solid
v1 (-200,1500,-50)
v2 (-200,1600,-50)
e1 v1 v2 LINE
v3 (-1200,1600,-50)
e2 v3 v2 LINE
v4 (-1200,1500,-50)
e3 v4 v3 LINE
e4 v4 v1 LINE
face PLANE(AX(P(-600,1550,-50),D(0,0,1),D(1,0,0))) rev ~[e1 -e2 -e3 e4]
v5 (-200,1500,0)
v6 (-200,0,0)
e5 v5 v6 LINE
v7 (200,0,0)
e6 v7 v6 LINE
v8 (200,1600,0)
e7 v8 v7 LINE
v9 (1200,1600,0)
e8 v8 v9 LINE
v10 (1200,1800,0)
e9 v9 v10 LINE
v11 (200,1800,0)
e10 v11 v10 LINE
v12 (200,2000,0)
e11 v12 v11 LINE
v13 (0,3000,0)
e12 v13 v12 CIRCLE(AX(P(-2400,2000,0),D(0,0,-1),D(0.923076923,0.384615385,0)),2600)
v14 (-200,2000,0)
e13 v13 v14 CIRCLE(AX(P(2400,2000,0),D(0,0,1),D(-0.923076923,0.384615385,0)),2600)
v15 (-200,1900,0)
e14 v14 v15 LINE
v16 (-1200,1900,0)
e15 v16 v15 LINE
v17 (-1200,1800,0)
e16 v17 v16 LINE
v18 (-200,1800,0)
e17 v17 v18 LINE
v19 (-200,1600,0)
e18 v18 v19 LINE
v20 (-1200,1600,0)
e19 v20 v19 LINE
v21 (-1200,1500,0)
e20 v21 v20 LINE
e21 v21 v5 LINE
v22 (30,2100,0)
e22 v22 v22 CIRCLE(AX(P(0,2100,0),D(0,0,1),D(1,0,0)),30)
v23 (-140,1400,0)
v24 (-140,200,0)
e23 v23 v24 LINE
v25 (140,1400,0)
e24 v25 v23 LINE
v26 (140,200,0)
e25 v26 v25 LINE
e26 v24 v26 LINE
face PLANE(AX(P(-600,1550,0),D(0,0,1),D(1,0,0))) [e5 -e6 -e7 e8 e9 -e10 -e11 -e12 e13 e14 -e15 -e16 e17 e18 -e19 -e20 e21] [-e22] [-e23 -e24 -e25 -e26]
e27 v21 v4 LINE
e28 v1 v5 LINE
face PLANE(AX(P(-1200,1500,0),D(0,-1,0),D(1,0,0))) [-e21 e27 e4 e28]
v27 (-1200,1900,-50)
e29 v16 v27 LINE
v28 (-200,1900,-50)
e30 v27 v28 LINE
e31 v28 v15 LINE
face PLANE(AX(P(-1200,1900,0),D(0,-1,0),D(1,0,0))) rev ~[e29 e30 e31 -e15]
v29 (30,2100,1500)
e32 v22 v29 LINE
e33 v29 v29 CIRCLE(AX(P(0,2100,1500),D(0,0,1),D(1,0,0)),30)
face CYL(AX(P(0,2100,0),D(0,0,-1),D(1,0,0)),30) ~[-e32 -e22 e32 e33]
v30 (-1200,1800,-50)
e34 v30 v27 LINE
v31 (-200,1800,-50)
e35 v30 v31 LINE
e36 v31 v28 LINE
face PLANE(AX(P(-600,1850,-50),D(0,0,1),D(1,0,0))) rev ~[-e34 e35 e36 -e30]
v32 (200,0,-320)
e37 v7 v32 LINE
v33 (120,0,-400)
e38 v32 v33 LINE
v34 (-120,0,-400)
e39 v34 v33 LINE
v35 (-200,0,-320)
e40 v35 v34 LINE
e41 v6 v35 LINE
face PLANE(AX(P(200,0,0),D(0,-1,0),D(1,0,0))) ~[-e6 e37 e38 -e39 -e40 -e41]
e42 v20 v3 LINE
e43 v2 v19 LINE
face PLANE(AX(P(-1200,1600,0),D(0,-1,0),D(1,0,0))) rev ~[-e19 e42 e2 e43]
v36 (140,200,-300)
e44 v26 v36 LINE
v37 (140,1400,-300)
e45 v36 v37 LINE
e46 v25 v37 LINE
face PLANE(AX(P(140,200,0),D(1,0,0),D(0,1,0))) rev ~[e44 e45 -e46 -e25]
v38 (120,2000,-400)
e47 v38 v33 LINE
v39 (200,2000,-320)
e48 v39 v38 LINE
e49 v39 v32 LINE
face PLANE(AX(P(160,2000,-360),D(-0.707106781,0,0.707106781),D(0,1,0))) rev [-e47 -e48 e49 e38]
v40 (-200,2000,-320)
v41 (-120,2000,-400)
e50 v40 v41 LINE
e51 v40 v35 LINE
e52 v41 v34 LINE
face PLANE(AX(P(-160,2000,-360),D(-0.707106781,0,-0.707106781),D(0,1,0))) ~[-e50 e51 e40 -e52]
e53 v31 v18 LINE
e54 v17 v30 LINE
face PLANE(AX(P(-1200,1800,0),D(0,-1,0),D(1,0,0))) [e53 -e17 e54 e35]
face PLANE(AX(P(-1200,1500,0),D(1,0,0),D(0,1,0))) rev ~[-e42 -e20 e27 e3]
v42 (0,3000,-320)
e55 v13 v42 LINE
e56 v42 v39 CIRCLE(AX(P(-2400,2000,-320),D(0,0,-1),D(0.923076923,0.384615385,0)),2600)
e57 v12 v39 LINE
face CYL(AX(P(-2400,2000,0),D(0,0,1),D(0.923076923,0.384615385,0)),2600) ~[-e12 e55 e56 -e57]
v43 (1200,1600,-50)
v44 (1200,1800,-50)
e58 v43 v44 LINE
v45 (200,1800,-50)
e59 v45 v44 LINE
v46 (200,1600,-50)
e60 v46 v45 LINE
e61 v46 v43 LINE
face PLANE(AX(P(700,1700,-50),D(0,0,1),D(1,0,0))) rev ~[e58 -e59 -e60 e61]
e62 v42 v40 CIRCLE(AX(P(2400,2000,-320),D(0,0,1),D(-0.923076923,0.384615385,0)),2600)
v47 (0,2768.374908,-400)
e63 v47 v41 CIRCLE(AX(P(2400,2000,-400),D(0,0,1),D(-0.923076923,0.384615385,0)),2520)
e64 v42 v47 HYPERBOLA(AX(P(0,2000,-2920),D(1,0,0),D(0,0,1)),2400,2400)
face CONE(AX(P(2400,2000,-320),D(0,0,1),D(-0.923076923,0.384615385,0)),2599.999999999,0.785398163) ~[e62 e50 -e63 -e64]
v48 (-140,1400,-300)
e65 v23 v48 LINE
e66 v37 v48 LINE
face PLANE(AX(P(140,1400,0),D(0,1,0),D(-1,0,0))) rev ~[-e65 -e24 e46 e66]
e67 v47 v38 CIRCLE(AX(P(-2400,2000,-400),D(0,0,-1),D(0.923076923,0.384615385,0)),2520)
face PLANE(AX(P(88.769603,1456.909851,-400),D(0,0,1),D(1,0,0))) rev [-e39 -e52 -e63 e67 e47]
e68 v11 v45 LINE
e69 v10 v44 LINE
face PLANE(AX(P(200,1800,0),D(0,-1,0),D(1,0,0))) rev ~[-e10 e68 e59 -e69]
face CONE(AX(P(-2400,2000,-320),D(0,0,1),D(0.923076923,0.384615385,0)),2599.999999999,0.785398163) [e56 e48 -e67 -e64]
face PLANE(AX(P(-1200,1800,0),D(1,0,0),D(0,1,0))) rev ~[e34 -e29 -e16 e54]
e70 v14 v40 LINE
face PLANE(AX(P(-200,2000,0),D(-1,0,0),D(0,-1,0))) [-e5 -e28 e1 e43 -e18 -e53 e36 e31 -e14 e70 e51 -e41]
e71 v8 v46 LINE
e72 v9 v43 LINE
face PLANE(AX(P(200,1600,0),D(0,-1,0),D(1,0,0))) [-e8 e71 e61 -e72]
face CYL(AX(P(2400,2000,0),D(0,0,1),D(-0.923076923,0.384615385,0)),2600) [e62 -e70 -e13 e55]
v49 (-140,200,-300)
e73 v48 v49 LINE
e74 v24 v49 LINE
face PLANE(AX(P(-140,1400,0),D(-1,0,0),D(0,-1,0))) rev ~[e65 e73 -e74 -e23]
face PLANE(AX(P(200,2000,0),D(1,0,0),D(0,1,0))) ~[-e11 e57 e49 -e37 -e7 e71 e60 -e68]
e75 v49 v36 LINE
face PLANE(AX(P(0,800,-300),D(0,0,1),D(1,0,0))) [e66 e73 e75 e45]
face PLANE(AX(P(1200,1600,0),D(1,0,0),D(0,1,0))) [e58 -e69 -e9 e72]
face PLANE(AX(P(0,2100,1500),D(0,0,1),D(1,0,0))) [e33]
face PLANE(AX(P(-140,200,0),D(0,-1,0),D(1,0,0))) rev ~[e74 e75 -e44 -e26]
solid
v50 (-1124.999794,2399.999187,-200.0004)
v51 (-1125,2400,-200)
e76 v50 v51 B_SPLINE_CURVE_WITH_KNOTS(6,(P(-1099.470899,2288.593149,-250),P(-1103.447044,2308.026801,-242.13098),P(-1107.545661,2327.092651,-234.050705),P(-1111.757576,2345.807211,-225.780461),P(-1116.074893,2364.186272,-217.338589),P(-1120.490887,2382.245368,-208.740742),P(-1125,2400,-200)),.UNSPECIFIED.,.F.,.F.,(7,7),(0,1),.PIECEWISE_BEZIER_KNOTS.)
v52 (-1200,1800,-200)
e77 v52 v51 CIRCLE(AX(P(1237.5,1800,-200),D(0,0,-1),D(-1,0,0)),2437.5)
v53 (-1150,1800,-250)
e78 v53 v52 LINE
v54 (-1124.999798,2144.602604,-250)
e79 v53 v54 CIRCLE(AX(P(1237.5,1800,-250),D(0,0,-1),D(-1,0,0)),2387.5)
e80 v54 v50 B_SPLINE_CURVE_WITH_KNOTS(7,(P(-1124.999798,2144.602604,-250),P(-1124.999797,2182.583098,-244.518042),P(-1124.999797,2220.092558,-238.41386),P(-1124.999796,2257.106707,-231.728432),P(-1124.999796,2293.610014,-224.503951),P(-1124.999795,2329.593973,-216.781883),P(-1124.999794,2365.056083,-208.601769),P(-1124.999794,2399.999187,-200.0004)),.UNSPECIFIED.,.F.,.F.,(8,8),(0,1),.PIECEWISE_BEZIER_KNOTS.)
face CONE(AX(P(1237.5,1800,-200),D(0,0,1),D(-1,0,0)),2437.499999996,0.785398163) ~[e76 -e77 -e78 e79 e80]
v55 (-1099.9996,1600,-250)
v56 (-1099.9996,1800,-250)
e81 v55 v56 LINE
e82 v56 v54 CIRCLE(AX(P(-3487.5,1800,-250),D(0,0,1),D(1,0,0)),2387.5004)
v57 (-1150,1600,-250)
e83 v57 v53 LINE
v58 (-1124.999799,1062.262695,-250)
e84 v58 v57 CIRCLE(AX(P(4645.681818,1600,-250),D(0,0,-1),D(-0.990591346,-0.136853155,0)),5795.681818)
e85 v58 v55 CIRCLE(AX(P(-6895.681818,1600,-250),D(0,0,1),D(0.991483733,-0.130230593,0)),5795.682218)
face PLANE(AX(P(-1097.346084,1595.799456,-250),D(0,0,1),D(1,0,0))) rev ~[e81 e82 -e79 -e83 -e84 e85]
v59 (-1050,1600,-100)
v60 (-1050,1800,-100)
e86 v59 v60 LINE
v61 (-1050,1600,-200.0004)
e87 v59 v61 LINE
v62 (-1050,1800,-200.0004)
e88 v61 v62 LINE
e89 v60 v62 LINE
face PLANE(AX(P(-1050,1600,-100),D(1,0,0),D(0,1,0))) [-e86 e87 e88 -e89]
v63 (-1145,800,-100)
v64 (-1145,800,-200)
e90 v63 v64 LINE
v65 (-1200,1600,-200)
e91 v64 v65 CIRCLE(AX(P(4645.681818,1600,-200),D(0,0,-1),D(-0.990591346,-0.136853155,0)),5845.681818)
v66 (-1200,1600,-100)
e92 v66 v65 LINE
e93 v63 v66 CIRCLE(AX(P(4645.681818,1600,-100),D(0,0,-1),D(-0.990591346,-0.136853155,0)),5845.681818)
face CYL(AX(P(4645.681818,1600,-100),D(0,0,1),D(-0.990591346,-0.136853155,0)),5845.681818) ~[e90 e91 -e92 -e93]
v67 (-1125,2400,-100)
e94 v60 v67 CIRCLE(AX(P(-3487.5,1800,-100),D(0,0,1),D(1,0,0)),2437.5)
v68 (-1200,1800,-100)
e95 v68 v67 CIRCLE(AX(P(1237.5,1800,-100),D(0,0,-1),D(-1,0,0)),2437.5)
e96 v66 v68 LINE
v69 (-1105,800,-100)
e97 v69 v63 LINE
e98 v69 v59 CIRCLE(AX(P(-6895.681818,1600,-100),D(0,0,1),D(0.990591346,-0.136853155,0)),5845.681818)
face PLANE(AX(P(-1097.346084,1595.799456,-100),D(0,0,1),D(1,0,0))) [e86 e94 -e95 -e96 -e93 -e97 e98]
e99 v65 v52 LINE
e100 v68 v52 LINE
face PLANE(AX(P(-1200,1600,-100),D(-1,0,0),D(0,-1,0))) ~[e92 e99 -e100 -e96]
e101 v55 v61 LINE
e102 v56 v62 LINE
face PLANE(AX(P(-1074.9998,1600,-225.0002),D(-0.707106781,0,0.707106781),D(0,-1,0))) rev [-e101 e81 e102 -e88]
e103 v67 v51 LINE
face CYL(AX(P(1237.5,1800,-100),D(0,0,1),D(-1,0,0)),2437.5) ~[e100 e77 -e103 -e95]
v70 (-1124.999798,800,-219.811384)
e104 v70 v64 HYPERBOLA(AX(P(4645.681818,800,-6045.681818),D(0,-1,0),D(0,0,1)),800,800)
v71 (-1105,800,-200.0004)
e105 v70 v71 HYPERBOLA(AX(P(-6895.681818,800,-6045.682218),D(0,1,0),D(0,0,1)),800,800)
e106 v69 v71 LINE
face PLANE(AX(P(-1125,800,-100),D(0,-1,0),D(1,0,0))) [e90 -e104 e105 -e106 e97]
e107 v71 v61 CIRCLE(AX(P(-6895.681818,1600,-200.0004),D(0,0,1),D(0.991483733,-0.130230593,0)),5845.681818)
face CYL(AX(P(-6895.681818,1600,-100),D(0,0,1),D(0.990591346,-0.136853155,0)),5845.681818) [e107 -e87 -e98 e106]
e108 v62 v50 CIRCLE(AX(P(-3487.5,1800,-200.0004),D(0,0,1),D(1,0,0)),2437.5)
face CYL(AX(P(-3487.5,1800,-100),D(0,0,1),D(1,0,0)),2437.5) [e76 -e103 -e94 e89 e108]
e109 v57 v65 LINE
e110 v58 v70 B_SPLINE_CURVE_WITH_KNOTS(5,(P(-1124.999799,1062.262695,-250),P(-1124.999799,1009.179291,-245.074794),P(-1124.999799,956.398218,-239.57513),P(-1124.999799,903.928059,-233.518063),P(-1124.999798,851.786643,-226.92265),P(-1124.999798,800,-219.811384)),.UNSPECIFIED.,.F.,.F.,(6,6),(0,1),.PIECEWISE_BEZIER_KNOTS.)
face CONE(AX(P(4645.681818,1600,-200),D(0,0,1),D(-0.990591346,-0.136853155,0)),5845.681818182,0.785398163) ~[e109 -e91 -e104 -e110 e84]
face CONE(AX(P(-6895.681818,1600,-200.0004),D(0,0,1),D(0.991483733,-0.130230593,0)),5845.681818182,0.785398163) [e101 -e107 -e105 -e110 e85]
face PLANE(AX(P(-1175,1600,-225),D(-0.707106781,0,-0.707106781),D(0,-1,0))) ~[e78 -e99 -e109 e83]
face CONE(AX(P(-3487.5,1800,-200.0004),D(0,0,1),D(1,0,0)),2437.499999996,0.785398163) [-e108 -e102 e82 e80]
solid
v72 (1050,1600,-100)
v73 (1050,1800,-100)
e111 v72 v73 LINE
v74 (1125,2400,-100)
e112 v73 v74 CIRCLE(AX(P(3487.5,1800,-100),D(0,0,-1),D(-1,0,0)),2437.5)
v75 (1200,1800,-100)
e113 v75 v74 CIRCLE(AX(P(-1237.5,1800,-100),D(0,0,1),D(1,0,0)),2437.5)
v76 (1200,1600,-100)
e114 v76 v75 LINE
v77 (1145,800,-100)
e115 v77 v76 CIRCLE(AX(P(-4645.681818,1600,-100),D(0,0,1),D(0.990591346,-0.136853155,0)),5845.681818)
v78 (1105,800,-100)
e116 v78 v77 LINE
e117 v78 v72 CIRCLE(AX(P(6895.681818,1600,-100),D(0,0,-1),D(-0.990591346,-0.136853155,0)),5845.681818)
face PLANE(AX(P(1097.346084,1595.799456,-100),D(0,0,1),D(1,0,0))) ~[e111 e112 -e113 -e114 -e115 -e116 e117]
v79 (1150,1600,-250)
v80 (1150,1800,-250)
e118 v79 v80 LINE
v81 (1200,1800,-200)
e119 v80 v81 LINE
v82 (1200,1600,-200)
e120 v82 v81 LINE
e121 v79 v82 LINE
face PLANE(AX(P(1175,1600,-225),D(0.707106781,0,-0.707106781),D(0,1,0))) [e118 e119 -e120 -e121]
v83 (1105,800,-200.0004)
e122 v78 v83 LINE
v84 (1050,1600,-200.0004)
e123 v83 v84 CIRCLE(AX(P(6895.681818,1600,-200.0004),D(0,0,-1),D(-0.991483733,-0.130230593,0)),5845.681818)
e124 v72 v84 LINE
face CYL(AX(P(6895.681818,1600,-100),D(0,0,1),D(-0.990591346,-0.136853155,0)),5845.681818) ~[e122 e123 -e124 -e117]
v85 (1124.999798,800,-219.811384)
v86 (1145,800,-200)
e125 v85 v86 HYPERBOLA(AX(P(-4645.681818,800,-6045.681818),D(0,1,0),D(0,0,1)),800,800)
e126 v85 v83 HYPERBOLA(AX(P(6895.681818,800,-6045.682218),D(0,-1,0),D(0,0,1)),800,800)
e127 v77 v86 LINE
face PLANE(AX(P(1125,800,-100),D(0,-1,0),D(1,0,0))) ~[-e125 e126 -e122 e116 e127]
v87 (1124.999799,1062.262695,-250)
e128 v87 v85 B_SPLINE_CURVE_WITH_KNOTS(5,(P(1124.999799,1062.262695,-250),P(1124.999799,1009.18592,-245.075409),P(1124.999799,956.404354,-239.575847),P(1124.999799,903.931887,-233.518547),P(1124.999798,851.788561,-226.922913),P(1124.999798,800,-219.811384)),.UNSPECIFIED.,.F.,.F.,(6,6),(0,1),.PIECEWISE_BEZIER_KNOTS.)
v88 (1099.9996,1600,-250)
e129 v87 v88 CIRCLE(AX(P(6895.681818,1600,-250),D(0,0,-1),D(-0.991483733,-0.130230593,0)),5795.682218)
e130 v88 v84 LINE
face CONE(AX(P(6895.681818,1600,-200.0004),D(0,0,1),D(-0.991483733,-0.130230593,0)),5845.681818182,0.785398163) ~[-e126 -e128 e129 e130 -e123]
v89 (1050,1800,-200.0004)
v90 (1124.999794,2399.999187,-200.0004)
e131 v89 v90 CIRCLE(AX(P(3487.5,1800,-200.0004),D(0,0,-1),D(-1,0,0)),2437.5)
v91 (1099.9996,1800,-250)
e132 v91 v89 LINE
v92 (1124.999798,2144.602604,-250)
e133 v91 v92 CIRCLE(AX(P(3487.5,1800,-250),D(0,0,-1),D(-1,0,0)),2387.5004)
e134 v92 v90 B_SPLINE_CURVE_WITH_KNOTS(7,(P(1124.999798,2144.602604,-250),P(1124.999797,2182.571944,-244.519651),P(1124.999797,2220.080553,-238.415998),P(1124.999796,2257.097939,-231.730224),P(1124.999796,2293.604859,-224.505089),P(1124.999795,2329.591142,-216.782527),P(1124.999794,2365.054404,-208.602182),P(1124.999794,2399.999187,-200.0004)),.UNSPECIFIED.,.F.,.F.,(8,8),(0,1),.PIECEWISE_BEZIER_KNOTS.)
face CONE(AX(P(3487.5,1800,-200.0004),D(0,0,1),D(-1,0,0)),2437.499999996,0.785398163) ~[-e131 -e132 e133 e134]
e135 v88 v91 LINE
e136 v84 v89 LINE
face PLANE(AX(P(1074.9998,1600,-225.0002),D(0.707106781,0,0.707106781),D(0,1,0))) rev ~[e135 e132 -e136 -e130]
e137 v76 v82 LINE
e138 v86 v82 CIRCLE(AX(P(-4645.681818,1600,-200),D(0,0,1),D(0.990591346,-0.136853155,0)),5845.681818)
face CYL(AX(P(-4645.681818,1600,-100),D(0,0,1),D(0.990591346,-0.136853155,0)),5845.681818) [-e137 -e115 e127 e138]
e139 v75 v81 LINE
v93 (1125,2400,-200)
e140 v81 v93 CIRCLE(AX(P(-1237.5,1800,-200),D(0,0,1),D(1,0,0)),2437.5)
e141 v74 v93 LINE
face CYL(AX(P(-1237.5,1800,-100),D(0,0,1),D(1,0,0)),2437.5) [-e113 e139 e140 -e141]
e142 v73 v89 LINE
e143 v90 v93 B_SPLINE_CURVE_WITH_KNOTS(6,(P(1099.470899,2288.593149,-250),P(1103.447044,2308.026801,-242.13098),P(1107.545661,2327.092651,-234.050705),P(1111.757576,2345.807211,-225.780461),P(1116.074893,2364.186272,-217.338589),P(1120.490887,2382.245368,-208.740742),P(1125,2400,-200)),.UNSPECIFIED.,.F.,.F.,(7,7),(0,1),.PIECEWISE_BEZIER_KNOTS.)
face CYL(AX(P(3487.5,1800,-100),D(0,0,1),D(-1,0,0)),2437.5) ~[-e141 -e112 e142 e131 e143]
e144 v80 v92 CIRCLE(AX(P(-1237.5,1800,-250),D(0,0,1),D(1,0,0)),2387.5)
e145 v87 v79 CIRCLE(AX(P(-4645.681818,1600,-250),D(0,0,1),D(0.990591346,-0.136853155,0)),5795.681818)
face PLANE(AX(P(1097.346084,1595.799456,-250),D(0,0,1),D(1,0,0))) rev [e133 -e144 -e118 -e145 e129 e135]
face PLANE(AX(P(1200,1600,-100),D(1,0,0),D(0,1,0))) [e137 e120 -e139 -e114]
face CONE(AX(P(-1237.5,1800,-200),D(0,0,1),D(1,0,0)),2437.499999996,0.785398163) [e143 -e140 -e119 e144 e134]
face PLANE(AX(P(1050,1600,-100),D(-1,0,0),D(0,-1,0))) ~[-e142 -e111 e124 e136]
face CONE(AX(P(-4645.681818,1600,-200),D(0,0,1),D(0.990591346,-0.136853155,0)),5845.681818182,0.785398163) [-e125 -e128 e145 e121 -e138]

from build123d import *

# Parameters (mm, degrees)
F1_DEPTH    = 400
F3_W        = 1200
F3_H        = 100
F4_DEPTH    = 50
F5_W        = 1000
F5_H        = 200
F6_DEPTH    = 50
F8_START    = -100
F8_DEPTH    = 150
F11_SIZE    = 80
F13_DEPTH   = 300
F14_R       = 30
F15_DEPTH   = 1500
F16_C1_SIZE = 50
F16_C2_SIZE = 49.9996
F17_C1_SIZE = 50
F17_C2_SIZE = 49.9996


# Not quite as in the source:
# - a fillet or chamfer is up to 0.001 mm smaller than in the source, because OpenCascade refuses the exact size


with BuildPart() as f1:
    # F0 (on Top) → F1 (new body)
    with BuildSketch(Plane.XY):
        with BuildLine():
            Line((-200, 0), (0, 0))
            Line((0, 0), (0, 3000))
            ThreePointArc((0, 3000), (-149.5097567964, 2509.9019513593), (-200, 2000))
            Line((-200, 2000), (-200, 0))
        make_face()
    extrude(amount=-F1_DEPTH)

    # F2: F1 across face


with BuildPart() as f1_1:
    add(f1.part)
    add(f1.part.mirror(Plane(origin=(0, 1500, -200), x_dir=(0, 1, 0), z_dir=(1, 0, 0))))

    # F3 (on Top) → F4 (join)
    with BuildSketch(Plane.XY):
        with Locations((-600, 1550)):
            Rectangle(F3_W, F3_H)
        with Locations((-600, 1850)):
            Rectangle(F3_W, F3_H)
    extrude(amount=-F4_DEPTH)

    # F5 (on face) → F6 (join)
    with BuildSketch(Plane.XY):
        with Locations((700, 1700)):
            Rectangle(F5_W, F5_H)
    extrude(amount=-F6_DEPTH)

    # F11
    f11_edges = [f1_1.edges().sort_by_distance(p)[0] for p in [
        (-200, 1000, -400),
        (-149.509757, 2509.901951, -400),
        (149.509757, 2509.901951, -400),
        (200, 1000, -400),
    ]]
    chamfer(f11_edges, length=F11_SIZE)

    # F12 (on face) → F13 (cut)
    with BuildSketch(Plane.XY):
        Polygon((140, 200), (140, 1400), (0, 1400), (-140, 1400), (-140, 200), (0, 200), align=None)
    extrude(amount=-F13_DEPTH, mode=Mode.SUBTRACT)

    # F14 (on face) → F15 (join)
    with BuildSketch(Plane.XY):
        with Locations((0, 2100)):
            Circle(F14_R)
    extrude(amount=F15_DEPTH)


with BuildPart() as f8:
    # F7 (on Top) → F8 (new body)
    with BuildSketch(Plane.XY.offset(F8_START)):
        with BuildLine():
            Line((1200, 1600), (1200, 1800))
            ThreePointArc((1200, 1800), (1181.1773244896, 2102.3346655612), (1125, 2400))
            Line((1125, 2400), (1125, 800))
            Line((1125, 800), (1145, 800))
            ThreePointArc((1145, 800), (1186.2337907259, 1199.0558018876), (1200, 1600))
        make_face()
    extrude(amount=-F8_DEPTH)

    # F9: F8 across face


with BuildPart() as f8_1:
    add(f8.part)
    add(f8.part.mirror(Plane(origin=(1125, 1600, -175), x_dir=(0, -1, 0), z_dir=(-1, 0, 0))))


with BuildPart() as f10_1:
    # F10: instance of F8
    add(f8_1.part.mirror(Plane.YZ))

    # F17: chamfer of 50 on 2 edges, made by hand

    # F17_c1
    f17_c1_edges = [f10_1.edges().sort_by_distance(p)[0] for p in [
        (-1200, 1700, -250),
        (-1181.1773244896, 2102.3346655612, -250),
        (-1186.2337907259, 1199.0558018876, -250),
    ]]
    chamfer(f17_c1_edges, length=F17_C1_SIZE)

    # F17_c2 (size 50 in the source; OpenCascade refuses exactly that, so slightly less here)
    f17_c2_edges = [f10_1.edges().sort_by_distance(p)[0] for p in [
        (-1062.3992616244, 2045.5456347202, -250),
        (-1050, 1700, -250),
        (-1062.4591242566, 1218.5436820583, -250),
    ]]
    chamfer(f17_c2_edges, length=F17_C2_SIZE)


with BuildPart() as f8_2:
    add(f8_1.part)

    # F16: chamfer of 50 on 2 edges, made by hand

    # F16_c1
    f16_c1_edges = [f8_2.edges().sort_by_distance(p)[0] for p in [
        (1200, 1700, -250),
        (1181.1773244896, 2102.3346655612, -250),
        (1186.2337907259, 1199.0558018876, -250),
    ]]
    chamfer(f16_c1_edges, length=F16_C1_SIZE)

    # F16_c2 (size 50 in the source; OpenCascade refuses exactly that, so slightly less here)
    f16_c2_edges = [f8_2.edges().sort_by_distance(p)[0] for p in [
        (1062.3992616244, 2045.5456347202, -250),
        (1050, 1700, -250),
        (1062.4591242566, 1218.5436820583, -250),
    ]]
    chamfer(f16_c2_edges, length=F16_C2_SIZE)


solid = Compound([f1_1.part, f10_1.part, f8_2.part])
